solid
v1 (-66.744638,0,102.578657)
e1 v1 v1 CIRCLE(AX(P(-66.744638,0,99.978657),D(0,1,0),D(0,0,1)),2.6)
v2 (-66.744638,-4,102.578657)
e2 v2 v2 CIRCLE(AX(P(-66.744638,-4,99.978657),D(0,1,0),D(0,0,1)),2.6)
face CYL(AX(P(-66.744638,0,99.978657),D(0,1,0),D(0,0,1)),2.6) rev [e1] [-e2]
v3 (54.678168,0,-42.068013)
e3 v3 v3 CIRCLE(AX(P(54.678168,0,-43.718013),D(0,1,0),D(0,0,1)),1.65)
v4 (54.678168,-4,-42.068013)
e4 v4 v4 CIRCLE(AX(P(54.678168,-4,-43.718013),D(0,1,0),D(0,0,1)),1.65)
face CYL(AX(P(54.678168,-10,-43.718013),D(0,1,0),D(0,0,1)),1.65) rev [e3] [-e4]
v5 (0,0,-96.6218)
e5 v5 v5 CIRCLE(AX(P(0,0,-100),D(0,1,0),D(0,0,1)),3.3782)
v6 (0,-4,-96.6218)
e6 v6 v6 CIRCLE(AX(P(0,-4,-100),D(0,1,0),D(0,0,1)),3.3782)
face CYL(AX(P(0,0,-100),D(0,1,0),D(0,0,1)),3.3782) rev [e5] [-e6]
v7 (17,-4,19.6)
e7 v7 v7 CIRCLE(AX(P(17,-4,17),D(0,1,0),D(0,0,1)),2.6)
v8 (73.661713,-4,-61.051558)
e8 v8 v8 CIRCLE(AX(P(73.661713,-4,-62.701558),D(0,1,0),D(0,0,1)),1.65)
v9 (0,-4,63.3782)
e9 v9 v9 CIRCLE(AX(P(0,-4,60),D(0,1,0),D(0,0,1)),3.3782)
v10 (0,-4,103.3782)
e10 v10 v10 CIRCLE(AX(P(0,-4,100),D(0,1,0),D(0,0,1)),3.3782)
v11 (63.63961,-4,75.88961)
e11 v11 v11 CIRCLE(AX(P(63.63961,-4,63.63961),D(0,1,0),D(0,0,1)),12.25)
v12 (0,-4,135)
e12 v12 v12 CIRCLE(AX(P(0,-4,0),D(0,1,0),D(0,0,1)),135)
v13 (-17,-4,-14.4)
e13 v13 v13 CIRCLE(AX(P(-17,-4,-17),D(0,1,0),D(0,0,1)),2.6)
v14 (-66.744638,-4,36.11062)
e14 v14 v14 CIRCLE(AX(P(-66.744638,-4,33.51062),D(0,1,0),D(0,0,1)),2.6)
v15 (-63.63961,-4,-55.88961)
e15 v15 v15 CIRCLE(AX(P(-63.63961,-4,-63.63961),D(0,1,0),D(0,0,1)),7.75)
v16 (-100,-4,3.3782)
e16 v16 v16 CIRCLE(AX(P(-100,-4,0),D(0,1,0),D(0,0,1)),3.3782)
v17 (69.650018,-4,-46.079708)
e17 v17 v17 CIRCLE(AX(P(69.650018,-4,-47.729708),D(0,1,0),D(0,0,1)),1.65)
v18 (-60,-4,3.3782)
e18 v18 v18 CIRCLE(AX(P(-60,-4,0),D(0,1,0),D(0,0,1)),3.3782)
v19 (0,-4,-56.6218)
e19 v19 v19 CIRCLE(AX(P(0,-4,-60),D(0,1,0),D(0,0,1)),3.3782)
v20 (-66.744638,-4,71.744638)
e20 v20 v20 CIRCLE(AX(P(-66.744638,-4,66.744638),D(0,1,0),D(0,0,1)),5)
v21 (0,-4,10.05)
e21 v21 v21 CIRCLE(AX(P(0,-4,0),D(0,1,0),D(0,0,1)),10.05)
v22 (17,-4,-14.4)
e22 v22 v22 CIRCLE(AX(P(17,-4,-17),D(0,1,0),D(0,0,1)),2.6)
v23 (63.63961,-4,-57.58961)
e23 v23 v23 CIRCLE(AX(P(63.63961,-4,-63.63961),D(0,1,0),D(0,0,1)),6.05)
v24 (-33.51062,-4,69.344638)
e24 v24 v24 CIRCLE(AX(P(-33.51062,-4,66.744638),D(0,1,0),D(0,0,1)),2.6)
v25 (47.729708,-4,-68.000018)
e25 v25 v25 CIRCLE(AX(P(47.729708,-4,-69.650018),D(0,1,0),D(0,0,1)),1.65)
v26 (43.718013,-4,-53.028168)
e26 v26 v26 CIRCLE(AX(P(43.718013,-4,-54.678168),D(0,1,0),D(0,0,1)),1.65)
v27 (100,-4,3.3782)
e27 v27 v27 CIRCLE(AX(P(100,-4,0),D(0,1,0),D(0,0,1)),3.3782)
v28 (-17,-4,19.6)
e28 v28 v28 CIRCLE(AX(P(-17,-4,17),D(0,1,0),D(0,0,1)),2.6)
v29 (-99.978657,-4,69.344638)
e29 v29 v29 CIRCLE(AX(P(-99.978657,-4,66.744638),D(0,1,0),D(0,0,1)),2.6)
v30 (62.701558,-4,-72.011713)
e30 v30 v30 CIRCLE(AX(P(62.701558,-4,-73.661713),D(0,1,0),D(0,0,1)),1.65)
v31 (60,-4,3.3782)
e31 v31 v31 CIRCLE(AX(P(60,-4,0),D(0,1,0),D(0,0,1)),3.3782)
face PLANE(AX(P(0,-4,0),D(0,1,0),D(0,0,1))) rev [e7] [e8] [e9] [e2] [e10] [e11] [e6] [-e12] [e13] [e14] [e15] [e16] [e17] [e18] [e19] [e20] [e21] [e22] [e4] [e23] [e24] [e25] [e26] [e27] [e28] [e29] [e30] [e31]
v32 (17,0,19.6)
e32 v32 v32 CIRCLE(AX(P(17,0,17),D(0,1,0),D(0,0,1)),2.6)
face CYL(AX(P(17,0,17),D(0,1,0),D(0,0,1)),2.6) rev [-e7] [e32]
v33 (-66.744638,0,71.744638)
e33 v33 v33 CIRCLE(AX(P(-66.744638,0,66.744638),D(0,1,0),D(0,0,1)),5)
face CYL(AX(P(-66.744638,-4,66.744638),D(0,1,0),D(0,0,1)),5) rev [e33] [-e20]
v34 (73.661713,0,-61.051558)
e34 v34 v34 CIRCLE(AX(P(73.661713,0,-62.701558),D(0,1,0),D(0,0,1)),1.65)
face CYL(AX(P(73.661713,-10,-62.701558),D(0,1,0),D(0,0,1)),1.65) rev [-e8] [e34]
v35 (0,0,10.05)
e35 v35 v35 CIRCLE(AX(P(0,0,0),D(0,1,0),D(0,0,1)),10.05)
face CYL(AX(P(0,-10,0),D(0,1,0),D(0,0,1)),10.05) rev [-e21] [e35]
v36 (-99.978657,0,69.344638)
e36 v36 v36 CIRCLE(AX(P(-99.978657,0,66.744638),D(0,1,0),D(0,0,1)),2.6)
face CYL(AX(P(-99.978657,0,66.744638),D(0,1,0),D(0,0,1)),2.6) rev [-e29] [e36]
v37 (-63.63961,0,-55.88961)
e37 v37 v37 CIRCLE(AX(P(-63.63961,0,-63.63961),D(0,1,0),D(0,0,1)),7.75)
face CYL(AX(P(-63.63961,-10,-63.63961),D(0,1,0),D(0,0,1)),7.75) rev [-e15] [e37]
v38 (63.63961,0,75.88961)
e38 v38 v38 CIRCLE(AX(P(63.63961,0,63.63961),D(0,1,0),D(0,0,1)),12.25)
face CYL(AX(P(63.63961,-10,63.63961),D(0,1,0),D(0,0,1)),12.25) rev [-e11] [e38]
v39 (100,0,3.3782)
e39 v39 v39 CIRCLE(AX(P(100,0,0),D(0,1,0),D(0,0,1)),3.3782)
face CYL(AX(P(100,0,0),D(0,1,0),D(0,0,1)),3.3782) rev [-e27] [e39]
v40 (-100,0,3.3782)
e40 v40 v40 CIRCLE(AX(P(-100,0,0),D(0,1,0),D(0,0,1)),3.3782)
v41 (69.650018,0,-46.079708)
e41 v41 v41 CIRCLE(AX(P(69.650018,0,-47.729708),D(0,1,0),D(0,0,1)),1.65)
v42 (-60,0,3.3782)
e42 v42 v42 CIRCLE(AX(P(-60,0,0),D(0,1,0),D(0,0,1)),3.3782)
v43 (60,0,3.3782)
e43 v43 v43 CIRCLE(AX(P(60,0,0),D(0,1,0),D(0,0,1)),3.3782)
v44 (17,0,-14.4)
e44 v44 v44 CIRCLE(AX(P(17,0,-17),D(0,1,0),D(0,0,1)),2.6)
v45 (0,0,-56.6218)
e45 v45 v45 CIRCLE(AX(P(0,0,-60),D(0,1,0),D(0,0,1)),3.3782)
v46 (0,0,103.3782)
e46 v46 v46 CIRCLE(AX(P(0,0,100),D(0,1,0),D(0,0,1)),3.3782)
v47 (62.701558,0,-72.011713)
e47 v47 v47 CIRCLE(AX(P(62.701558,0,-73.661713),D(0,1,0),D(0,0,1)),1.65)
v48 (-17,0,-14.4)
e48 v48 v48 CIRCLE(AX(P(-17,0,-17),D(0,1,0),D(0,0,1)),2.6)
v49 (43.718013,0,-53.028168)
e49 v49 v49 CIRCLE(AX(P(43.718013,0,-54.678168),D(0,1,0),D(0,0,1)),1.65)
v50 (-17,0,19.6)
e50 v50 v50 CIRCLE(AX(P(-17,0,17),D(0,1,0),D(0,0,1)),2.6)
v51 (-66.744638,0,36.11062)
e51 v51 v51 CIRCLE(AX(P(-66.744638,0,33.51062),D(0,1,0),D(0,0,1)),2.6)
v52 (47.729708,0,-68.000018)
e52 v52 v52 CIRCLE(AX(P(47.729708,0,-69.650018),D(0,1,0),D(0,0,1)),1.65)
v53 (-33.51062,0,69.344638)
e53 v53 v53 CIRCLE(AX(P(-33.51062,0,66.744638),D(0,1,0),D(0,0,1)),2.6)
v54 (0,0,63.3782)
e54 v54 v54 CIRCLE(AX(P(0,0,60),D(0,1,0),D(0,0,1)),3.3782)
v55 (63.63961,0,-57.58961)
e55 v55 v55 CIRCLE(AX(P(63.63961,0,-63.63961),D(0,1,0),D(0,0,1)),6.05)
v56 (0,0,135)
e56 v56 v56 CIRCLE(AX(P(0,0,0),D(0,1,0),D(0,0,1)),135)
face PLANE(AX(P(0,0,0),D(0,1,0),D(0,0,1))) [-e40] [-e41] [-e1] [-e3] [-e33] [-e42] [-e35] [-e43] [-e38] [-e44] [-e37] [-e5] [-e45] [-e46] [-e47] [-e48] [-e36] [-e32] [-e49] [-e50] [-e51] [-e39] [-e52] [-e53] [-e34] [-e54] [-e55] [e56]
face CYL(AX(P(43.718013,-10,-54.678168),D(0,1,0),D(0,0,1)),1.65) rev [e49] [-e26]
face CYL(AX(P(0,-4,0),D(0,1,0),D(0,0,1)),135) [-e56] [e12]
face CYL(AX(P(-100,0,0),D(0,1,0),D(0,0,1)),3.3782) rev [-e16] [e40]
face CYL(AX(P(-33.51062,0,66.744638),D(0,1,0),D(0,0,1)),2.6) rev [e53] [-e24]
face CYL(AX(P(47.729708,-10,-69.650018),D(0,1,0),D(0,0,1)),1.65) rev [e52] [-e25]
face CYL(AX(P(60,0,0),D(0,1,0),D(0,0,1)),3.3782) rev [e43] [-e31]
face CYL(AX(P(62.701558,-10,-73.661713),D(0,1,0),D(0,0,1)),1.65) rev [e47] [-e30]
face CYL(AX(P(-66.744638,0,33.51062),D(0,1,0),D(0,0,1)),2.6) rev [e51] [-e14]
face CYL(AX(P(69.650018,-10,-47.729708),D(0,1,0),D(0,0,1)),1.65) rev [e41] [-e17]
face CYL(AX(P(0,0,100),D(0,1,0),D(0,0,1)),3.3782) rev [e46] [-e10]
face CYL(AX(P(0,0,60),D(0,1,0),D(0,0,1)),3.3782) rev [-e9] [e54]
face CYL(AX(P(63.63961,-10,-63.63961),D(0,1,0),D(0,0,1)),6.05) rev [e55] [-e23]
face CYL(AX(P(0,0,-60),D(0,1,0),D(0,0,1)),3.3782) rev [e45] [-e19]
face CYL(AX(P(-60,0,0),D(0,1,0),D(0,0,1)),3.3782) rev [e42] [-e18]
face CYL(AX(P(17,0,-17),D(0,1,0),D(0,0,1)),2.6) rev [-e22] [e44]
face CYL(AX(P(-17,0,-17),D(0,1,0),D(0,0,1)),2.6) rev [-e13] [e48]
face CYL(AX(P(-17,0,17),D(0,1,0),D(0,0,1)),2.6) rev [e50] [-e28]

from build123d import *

# Parameters (mm, degrees)
CROQUIS1_R                    = 135
BRIDA_BASE1_DEPTH             = 4
CROQUIS6_R                    = 1.65
CROQUIS6_R_2                  = 6.05
CROQUIS6_R_3                  = 12.25
CROQUIS6_R_4                  = 7.75
CORTAR_EXTRUIR1_DEPTH         = 10
TALADRO_DE_MARGEN_PARA_1_41_D = 6.7564
CROQUIS11_R                   = 10.05
CORTAR_EXTRUIR3_DEPTH         = 10
TALADRO_DE_MARGEN_PARA_M51_D  = 5.2
TALADRO_DE_MARGEN_PARA_M52_D  = 5.2
CROQUIS16_R                   = 5
CORTAR_EXTRUIR4_DEPTH         = 191.960728947


# Sheet-metal steps are written as plain solids
with BuildPart() as part:
    # Croquis1 → Brida base1 (new body)
    with BuildSketch(Plane(origin=(0, 0, 0), x_dir=(1, 0, 0), z_dir=(0, 1, 0))):
        with Locations(Location((0, 0, 0), (0, 0, 270))):
            Circle(CROQUIS1_R)
    extrude(amount=-BRIDA_BASE1_DEPTH)

    # Croquis6 → Cortar-Extruir1 (cut)
    with BuildSketch(Plane(origin=(0, 0, 0), x_dir=(1, 0, 0), z_dir=(0, 1, 0))):
        with Locations(Location((43.718012531, 54.678167639, 0), (0, 0, 270))):
            Circle(CROQUIS6_R)
        with Locations(Location((47.72970773, 69.650017947, 0), (0, 0, 270))):
            Circle(CROQUIS6_R)
        with Locations(Location((63.639610307, 63.639610307, 0), (0, 0, 270))):
            Circle(CROQUIS6_R_2)
        with Locations(Location((63.639610307, -63.639610307, 0), (0, 0, 270))):
            Circle(CROQUIS6_R_3)
        with Locations(Location((-63.639610307, 63.639610307, 0), (0, 0, 270))):
            Circle(CROQUIS6_R_4)
        with Locations(Location((62.701558038, 73.661713146, 0), (0, 0, 270))):
            Circle(CROQUIS6_R)
        with Locations(Location((73.661713146, 62.701558038, 0), (0, 0, 270))):
            Circle(CROQUIS6_R)
        with Locations(Location((69.650017947, 47.72970773, 0), (0, 0, 270))):
            Circle(CROQUIS6_R)
        with Locations(Location((54.678167639, 43.718012531, 0), (0, 0, 270))):
            Circle(CROQUIS6_R)
    extrude(amount=-CORTAR_EXTRUIR1_DEPTH, mode=Mode.SUBTRACT)

    # Taladro de margen para 1/41 (through all)
    with Locations(Plane(origin=(0, 0, 0), x_dir=(1, 0, 0), z_dir=(0, 1, 0))):
        with Locations((100, 0), (60, 0), (0, -100), (0, -60), (-100, 0), (-60, 0), (0, 100), (0, 60), (0, 0)):
            Hole(TALADRO_DE_MARGEN_PARA_1_41_D / 2)

    # Croquis11 → Cortar-Extruir3 (cut)
    with BuildSketch(Plane(origin=(0, 0, 0), x_dir=(1, 0, 0), z_dir=(0, 1, 0))):
        with Locations(Location((0, 0, 0), (0, 0, 270))):
            Circle(CROQUIS11_R)
    extrude(amount=-CORTAR_EXTRUIR3_DEPTH, mode=Mode.SUBTRACT)

    # Taladro de margen para M51 (through all)
    with Locations(Plane(origin=(0, 0, 0), x_dir=(1, 0, 0), z_dir=(0, 1, 0))):
        with Locations((17, 17), (-17, 17), (-17, -17), (17, -17)):
            Hole(TALADRO_DE_MARGEN_PARA_M51_D / 2)

    # Taladro de margen para M52 (through all)
    with Locations(Plane(origin=(0, 0, 0), x_dir=(1, 0, 0), z_dir=(0, 1, 0))):
        with Locations((-33.510619649, -66.744638365), (-66.744638365, -99.97865708), (-99.97865708, -66.744638365), (-66.744638365, -33.510619649), (-66.744638365, -66.744638365)):
            Hole(TALADRO_DE_MARGEN_PARA_M52_D / 2)

    # Croquis16 → Cortar-Extruir4 (cut, through all)
    with BuildSketch(Plane(origin=(0, 0, 0), x_dir=(1, 0, 0), z_dir=(0, 1, 0))):
        with Locations(Location((-66.744638365, -66.744638365, 0), (0, 0, 270))):
            Circle(CROQUIS16_R)
    extrude(amount=-CORTAR_EXTRUIR4_DEPTH, mode=Mode.SUBTRACT)


solid = part.part
